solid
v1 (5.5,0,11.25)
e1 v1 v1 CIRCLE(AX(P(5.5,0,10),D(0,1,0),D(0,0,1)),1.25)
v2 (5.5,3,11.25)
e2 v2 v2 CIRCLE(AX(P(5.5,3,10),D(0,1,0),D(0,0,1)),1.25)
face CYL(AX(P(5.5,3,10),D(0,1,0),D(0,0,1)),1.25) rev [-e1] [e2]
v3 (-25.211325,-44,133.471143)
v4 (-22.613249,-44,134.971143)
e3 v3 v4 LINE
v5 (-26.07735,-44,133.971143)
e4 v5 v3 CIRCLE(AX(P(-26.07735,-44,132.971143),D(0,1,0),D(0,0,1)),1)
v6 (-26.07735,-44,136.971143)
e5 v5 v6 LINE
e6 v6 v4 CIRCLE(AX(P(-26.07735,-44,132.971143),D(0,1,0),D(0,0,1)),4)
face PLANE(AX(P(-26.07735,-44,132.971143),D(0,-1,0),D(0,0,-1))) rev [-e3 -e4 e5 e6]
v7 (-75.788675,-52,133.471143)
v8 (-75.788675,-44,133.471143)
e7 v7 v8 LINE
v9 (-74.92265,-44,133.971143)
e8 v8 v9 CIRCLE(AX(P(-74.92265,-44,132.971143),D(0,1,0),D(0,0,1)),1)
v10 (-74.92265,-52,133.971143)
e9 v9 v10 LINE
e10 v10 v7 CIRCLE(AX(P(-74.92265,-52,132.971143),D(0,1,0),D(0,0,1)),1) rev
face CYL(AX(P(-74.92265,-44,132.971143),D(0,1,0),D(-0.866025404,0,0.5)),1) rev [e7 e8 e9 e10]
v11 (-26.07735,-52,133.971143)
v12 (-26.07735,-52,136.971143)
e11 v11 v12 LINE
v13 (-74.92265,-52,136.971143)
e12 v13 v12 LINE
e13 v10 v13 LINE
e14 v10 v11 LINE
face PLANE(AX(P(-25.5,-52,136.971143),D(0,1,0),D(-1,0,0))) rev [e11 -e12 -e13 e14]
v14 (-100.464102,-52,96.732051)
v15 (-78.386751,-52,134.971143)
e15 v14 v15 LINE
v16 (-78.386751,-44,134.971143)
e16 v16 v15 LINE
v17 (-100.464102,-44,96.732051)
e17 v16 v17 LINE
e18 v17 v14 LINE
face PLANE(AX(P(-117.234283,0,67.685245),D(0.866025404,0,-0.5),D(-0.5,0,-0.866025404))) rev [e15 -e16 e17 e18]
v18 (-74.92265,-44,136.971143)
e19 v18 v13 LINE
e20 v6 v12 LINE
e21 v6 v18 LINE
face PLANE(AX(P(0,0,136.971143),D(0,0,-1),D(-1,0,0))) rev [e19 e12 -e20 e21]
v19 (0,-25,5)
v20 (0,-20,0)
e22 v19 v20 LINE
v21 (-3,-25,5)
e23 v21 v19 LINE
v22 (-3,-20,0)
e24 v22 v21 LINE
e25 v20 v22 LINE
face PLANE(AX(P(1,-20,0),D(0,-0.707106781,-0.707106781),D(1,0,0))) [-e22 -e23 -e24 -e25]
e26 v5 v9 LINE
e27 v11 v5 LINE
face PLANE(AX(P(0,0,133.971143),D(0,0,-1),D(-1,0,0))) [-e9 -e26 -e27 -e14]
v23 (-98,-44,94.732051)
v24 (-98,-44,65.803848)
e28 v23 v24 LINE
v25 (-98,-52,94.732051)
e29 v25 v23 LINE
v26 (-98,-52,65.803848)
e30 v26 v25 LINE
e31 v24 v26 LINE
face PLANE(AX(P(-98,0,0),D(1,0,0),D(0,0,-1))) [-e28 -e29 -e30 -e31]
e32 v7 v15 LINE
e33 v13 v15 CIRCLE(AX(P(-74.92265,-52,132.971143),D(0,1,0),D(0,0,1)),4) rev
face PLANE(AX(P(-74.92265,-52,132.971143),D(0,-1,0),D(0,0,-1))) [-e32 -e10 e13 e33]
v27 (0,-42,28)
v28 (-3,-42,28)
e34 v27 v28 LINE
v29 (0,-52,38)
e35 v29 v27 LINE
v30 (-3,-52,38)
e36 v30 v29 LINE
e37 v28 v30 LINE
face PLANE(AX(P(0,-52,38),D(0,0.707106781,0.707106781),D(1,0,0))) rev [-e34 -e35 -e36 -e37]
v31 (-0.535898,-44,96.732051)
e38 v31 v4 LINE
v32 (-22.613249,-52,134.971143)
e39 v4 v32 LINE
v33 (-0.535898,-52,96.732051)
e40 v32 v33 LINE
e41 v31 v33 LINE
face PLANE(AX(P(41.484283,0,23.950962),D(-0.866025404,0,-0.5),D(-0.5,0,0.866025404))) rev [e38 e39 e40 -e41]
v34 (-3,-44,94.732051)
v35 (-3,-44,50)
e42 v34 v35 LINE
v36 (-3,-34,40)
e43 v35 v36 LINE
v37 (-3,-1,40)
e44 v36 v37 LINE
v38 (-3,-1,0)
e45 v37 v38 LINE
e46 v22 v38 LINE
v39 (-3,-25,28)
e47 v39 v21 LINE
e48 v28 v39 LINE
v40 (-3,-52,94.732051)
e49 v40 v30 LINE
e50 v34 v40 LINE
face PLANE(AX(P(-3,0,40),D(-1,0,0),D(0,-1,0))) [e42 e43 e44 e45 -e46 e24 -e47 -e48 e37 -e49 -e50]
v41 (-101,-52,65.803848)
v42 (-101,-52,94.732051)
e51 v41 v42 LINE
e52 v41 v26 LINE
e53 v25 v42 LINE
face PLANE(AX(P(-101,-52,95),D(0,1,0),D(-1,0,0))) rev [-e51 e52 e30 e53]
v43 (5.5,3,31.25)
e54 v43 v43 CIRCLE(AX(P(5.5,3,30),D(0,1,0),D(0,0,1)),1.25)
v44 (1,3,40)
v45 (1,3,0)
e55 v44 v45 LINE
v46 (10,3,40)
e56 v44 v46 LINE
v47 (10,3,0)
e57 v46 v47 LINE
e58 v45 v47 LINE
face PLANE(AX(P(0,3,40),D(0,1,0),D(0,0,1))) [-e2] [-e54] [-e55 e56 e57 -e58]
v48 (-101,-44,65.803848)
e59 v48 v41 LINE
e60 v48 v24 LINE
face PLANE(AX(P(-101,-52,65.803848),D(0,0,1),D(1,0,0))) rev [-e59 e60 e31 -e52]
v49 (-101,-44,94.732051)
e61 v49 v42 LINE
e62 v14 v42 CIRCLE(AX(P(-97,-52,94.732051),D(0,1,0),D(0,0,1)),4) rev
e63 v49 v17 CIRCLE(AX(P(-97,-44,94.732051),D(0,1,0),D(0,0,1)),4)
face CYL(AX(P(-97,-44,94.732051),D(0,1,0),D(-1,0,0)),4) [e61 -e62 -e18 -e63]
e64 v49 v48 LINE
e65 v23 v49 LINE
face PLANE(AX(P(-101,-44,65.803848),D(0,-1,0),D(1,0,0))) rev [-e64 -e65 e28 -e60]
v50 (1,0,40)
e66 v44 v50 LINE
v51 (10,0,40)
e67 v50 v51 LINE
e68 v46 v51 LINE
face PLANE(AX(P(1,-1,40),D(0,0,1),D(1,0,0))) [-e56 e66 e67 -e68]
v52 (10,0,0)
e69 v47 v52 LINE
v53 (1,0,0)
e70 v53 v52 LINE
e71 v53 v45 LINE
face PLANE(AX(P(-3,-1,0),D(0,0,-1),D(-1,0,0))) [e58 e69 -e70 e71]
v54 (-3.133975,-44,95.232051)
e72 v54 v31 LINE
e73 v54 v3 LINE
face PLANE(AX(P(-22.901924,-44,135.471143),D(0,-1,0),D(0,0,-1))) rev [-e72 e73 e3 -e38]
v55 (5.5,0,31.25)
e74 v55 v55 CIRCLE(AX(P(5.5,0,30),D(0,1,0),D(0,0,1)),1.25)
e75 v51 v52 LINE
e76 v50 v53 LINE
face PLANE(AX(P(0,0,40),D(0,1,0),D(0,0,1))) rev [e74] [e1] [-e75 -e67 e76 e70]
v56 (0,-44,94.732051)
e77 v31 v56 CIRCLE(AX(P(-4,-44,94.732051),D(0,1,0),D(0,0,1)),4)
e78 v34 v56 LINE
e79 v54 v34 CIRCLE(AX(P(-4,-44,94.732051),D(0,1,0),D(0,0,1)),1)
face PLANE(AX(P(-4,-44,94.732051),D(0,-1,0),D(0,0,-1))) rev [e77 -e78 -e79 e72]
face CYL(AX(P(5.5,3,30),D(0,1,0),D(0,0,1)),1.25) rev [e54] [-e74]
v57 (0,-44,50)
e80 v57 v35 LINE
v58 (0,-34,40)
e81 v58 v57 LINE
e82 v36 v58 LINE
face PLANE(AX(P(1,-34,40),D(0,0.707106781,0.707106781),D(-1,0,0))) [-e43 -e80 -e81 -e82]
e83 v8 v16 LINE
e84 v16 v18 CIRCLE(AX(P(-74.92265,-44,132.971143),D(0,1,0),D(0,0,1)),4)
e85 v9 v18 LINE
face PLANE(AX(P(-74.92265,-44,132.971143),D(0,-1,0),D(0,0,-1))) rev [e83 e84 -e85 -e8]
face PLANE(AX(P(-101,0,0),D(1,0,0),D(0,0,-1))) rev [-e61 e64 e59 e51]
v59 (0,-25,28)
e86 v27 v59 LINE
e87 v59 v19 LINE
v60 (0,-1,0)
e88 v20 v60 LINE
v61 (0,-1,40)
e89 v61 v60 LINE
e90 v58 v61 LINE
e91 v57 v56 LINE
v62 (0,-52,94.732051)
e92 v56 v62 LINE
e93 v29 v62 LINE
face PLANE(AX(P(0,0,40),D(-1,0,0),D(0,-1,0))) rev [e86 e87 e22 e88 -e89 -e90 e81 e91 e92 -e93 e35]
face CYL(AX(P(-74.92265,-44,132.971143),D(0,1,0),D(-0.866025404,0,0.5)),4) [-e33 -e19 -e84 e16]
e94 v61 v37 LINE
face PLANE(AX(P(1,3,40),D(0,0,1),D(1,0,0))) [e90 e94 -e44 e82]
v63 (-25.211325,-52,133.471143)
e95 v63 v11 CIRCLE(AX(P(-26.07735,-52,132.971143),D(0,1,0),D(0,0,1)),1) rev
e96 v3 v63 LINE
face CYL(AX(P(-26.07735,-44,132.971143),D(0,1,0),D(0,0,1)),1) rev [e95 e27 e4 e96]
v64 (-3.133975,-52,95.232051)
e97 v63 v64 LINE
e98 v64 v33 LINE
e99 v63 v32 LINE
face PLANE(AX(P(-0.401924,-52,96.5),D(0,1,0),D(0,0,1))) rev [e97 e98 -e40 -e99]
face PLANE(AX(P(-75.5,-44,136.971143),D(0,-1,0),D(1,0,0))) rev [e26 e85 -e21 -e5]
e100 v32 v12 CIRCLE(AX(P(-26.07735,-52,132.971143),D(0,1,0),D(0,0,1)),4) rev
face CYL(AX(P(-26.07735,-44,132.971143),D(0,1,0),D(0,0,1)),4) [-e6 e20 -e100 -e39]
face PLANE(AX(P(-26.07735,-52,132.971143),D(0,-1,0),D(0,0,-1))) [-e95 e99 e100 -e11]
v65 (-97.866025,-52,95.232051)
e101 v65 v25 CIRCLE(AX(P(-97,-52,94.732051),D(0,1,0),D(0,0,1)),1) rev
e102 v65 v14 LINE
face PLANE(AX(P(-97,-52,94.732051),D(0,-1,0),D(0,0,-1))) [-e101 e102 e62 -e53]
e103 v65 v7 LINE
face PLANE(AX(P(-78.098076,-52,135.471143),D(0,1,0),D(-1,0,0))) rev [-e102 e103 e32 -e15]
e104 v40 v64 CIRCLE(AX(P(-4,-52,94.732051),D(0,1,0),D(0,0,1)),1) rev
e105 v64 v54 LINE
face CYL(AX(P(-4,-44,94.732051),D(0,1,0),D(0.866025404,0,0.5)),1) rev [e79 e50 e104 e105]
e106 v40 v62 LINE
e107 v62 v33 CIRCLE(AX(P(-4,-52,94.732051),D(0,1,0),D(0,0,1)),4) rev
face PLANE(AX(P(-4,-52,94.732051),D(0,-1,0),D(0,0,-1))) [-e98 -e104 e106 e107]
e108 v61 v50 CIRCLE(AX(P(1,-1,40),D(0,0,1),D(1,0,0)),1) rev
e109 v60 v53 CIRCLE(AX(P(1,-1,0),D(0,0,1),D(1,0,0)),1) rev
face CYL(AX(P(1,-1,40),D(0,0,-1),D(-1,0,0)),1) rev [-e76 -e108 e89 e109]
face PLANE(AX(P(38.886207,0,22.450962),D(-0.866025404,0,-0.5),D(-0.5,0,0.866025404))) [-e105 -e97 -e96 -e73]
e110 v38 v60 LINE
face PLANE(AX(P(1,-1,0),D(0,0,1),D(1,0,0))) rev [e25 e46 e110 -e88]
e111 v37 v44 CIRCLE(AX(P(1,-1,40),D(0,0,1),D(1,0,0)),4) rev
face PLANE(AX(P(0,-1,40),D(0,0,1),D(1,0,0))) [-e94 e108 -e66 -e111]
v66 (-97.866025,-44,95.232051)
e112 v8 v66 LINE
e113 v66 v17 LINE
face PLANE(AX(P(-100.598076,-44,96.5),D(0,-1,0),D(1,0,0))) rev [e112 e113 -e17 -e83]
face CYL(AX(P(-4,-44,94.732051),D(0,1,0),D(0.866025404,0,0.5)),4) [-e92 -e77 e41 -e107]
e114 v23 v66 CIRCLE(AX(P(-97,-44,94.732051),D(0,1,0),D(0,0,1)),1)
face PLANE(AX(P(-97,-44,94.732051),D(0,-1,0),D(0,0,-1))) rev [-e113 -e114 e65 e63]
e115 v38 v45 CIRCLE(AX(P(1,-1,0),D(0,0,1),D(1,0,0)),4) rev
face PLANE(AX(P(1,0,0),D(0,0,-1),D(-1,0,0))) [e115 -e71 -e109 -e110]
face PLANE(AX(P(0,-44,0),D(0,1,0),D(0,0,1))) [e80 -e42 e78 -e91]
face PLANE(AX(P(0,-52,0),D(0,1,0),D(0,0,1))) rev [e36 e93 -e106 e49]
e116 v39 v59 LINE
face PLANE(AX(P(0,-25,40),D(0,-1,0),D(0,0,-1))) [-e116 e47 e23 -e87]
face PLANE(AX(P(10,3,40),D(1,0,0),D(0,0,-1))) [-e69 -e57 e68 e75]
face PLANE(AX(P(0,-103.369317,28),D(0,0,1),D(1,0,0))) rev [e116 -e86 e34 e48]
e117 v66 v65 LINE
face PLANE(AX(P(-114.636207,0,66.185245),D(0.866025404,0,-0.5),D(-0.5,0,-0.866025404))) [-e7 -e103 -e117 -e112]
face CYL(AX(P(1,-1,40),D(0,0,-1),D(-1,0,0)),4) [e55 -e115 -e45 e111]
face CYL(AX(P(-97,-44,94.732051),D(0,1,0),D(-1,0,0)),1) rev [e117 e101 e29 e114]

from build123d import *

# Parameters (mm, degrees)
SM_BASE_FLANGE_1_DEPTH           = 40
M3X0_5_1_D                       = 2.5
SKETCH_22_W                      = 3
SKETCH_22_H                      = 12
EXTRUDE_6_DEPTH                  = 19
SKETCH_23_W                      = 3
SKETCH_23_H                      = 67
EXTRUDE_7_DEPTH                  = 8
CHAMFER_1_SIZE                   = 10
CHAMFER_2_SIZE                   = 5
SM_EDGE_FLANGE_1_STRIP_CUT_DEPTH = 8
SM_EDGE_FLANGE_1_DEPTH           = 8
SM_EDGE_FLANGE_2_STRIP_CUT_DEPTH = 8
SM_EDGE_FLANGE_2_DEPTH           = 8
SM_EDGE_FLANGE_3_STRIP_CUT_DEPTH = 8
SM_EDGE_FLANGE_3_DEPTH           = 8
SM_EDGE_FLANGE_4_STRIP_CUT_DEPTH = 8
SM_EDGE_FLANGE_4_DEPTH           = 8


# Sheet-metal steps are written as plain solids
with BuildPart() as part:
    # 草圖3 → 基材-凸緣1 (new body)
    with BuildSketch(Plane.XY):
        with BuildLine():
            Line((10, 0), (1, 0))
            ThreePointArc((1, 0), (0.292893219, -0.292893219), (0, -1))
            Line((0, -1), (0, -25))
            Line((0, -25), (-3, -25))
            Line((-3, -25), (-3, -1))
            ThreePointArc((-3, -1), (-1.828427125, 1.828427125), (1, 3))
            Line((1, 3), (10, 3))
            Line((10, 3), (10, 0))
        make_face()
    extrude(amount=SM_BASE_FLANGE_1_DEPTH)

    # M3x0.5 螺紋孔1 (through all)
    with Locations(Plane(origin=(0, 3, 0), x_dir=(1, 0, 0), z_dir=(0, 1, 0))):
        with Locations((5.5, -30), (5.5, -10)):
            Hole(M3X0_5_1_D / 2)

    # 草圖22 → 填料-伸長6 (add)
    with BuildSketch(Plane.XZ.offset(25)):
        with Locations((-1.5, 34)):
            Rectangle(SKETCH_22_W, SKETCH_22_H)
    extrude(amount=EXTRUDE_6_DEPTH)

    # 草圖23 → 填料-伸長7 (add)
    with BuildSketch(Plane.XZ.offset(44)):
        with Locations((-1.5, 61.5)):
            Rectangle(SKETCH_23_W, SKETCH_23_H)
    extrude(amount=EXTRUDE_7_DEPTH)

    # 導角1
    chamfer_1_edges = [part.edges().sort_by_distance(p)[0] for p in [
        (-1.5, -44, 40),
        (-1.5, -52, 28),
    ]]
    chamfer(chamfer_1_edges, length=CHAMFER_1_SIZE)

    # 導角2
    chamfer_2_edges = [part.edges().sort_by_distance(p)[0] for p in [
        (-1.5, -25, 0),
    ]]
    chamfer(chamfer_2_edges, length=CHAMFER_2_SIZE)

    # 邊線-凸緣1 strip (across the edge) → 邊線-凸緣1 strip cut (cut)
    with BuildSketch(Plane(origin=(-3, -52, 95), x_dir=(-0.8660254037844416, 0, -0.49999999999999495), z_dir=(0, 1, 0))):
        Polygon((-9.464101615, 10.392304845), (-2.464101615, -1.732050808), (0.133974596, -0.232050808), (-6.866025404, 11.892304845), align=None)
    extrude(amount=SM_EDGE_FLANGE_1_STRIP_CUT_DEPTH, mode=Mode.SUBTRACT)

    # 邊線-凸緣1 section (across the edge) → 邊線-凸緣1 (add)
    with BuildSketch(Plane(origin=(-3, -52, 95), x_dir=(-0.8660254037844416, 0, -0.49999999999999495), z_dir=(0, 1, 0))):
        with BuildLine():
            Line((-3, 0.267949192), (-3, 45))
            Line((-3, 45), (0, 45))
            Line((0, 45), (0, 0.267949192))
            ThreePointArc((0, 0.267949192), (0.034074174, 0.009130147), (0.133974596, -0.232050808))
            Line((0.133974596, -0.232050808), (-2.464101615, -1.732050808))
            ThreePointArc((-2.464101615, -1.732050808), (-2.863703305, -0.767326988), (-3, 0.267949192))
        make_face()
    extrude(amount=SM_EDGE_FLANGE_1_DEPTH)

    # 邊線-凸緣2 strip (across the edge) → 邊線-凸緣2 strip cut (cut)
    with BuildSketch(Plane(origin=(-25.5, -52, 133.97114317), x_dir=(0, 0, -1), z_dir=(0, 1, 0))):
        Polygon((-13.124355653, 4.113248654), (-1, -2.886751346), (0.5, -0.288675135), (-11.624355653, 6.711324865), align=None)
    extrude(amount=SM_EDGE_FLANGE_2_STRIP_CUT_DEPTH, mode=Mode.SUBTRACT)

    # 邊線-凸緣2 section (across the edge) → 邊線-凸緣2 (add)
    with BuildSketch(Plane(origin=(-25.5, -52, 133.97114317), x_dir=(0, 0, -1), z_dir=(0, 1, 0))):
        with BuildLine():
            Line((-3, 0.577350269), (-3, 50))
            Line((-3, 50), (0, 50))
            Line((0, 50), (0, 0.577350269))
            ThreePointArc((0, 0.577350269), (0.133974596, 0.077350269), (0.5, -0.288675135))
            Line((0.5, -0.288675135), (-1, -2.886751346))
            ThreePointArc((-1, -2.886751346), (-2.464101615, -1.422649731), (-3, 0.577350269))
        make_face()
    extrude(amount=SM_EDGE_FLANGE_2_DEPTH)

    # 邊線-凸緣3 strip (across the edge) → 邊線-凸緣3 strip cut (cut)
    with BuildSketch(Plane(origin=(-75.5, -52, 133.97114317), x_dir=(0.8660254037844312, -1.5023145987371476e-15, -0.5000000000000132), z_dir=(0, 1, 0))):
        Polygon((-13.124355653, 4.113248654), (-1, -2.886751346), (0.5, -0.288675135), (-11.624355653, 6.711324865), align=None)
    extrude(amount=SM_EDGE_FLANGE_3_STRIP_CUT_DEPTH, mode=Mode.SUBTRACT)

    # 邊線-凸緣3 section (across the edge) → 邊線-凸緣3 (add)
    with BuildSketch(Plane(origin=(-75.5, -52, 133.97114317), x_dir=(0.8660254037844312, -1.5023145987371476e-15, -0.5000000000000132), z_dir=(0, 1, 0))):
        with BuildLine():
            Line((-3, 0.577350269), (-3, 45))
            Line((-3, 45), (0, 45))
            Line((0, 45), (0, 0.577350269))
            ThreePointArc((0, 0.577350269), (0.133974596, 0.077350269), (0.5, -0.288675135))
            Line((0.5, -0.288675135), (-1, -2.886751346))
            ThreePointArc((-1, -2.886751346), (-2.464101615, -1.422649731), (-3, 0.577350269))
        make_face()
    extrude(amount=SM_EDGE_FLANGE_3_DEPTH)

    # 邊線-凸緣4 strip (across the edge) → 邊線-凸緣4 strip cut (cut)
    with BuildSketch(Plane(origin=(-98, -52, 95), x_dir=(1, 0, 0), z_dir=(0, 1, 0))):
        Polygon((-9.464101615, 10.392304845), (-2.464101615, -1.732050808), (0.133974596, -0.232050808), (-6.866025404, 11.892304845), align=None)
    extrude(amount=SM_EDGE_FLANGE_4_STRIP_CUT_DEPTH, mode=Mode.SUBTRACT)

    # 邊線-凸緣4 section (across the edge) → 邊線-凸緣4 (add)
    with BuildSketch(Plane(origin=(-98, -52, 95), x_dir=(1, 0, 0), z_dir=(0, 1, 0))):
        with BuildLine():
            Line((-3, 0.267949192), (-3, 29.196152423))
            Line((-3, 29.196152423), (0, 29.196152423))
            Line((0, 29.196152423), (0, 0.267949192))
            ThreePointArc((0, 0.267949192), (0.034074174, 0.009130147), (0.133974596, -0.232050808))
            Line((0.133974596, -0.232050808), (-2.464101615, -1.732050808))
            ThreePointArc((-2.464101615, -1.732050808), (-2.863703305, -0.767326988), (-3, 0.267949192))
        make_face()
    extrude(amount=SM_EDGE_FLANGE_4_DEPTH)


solid = part.part
